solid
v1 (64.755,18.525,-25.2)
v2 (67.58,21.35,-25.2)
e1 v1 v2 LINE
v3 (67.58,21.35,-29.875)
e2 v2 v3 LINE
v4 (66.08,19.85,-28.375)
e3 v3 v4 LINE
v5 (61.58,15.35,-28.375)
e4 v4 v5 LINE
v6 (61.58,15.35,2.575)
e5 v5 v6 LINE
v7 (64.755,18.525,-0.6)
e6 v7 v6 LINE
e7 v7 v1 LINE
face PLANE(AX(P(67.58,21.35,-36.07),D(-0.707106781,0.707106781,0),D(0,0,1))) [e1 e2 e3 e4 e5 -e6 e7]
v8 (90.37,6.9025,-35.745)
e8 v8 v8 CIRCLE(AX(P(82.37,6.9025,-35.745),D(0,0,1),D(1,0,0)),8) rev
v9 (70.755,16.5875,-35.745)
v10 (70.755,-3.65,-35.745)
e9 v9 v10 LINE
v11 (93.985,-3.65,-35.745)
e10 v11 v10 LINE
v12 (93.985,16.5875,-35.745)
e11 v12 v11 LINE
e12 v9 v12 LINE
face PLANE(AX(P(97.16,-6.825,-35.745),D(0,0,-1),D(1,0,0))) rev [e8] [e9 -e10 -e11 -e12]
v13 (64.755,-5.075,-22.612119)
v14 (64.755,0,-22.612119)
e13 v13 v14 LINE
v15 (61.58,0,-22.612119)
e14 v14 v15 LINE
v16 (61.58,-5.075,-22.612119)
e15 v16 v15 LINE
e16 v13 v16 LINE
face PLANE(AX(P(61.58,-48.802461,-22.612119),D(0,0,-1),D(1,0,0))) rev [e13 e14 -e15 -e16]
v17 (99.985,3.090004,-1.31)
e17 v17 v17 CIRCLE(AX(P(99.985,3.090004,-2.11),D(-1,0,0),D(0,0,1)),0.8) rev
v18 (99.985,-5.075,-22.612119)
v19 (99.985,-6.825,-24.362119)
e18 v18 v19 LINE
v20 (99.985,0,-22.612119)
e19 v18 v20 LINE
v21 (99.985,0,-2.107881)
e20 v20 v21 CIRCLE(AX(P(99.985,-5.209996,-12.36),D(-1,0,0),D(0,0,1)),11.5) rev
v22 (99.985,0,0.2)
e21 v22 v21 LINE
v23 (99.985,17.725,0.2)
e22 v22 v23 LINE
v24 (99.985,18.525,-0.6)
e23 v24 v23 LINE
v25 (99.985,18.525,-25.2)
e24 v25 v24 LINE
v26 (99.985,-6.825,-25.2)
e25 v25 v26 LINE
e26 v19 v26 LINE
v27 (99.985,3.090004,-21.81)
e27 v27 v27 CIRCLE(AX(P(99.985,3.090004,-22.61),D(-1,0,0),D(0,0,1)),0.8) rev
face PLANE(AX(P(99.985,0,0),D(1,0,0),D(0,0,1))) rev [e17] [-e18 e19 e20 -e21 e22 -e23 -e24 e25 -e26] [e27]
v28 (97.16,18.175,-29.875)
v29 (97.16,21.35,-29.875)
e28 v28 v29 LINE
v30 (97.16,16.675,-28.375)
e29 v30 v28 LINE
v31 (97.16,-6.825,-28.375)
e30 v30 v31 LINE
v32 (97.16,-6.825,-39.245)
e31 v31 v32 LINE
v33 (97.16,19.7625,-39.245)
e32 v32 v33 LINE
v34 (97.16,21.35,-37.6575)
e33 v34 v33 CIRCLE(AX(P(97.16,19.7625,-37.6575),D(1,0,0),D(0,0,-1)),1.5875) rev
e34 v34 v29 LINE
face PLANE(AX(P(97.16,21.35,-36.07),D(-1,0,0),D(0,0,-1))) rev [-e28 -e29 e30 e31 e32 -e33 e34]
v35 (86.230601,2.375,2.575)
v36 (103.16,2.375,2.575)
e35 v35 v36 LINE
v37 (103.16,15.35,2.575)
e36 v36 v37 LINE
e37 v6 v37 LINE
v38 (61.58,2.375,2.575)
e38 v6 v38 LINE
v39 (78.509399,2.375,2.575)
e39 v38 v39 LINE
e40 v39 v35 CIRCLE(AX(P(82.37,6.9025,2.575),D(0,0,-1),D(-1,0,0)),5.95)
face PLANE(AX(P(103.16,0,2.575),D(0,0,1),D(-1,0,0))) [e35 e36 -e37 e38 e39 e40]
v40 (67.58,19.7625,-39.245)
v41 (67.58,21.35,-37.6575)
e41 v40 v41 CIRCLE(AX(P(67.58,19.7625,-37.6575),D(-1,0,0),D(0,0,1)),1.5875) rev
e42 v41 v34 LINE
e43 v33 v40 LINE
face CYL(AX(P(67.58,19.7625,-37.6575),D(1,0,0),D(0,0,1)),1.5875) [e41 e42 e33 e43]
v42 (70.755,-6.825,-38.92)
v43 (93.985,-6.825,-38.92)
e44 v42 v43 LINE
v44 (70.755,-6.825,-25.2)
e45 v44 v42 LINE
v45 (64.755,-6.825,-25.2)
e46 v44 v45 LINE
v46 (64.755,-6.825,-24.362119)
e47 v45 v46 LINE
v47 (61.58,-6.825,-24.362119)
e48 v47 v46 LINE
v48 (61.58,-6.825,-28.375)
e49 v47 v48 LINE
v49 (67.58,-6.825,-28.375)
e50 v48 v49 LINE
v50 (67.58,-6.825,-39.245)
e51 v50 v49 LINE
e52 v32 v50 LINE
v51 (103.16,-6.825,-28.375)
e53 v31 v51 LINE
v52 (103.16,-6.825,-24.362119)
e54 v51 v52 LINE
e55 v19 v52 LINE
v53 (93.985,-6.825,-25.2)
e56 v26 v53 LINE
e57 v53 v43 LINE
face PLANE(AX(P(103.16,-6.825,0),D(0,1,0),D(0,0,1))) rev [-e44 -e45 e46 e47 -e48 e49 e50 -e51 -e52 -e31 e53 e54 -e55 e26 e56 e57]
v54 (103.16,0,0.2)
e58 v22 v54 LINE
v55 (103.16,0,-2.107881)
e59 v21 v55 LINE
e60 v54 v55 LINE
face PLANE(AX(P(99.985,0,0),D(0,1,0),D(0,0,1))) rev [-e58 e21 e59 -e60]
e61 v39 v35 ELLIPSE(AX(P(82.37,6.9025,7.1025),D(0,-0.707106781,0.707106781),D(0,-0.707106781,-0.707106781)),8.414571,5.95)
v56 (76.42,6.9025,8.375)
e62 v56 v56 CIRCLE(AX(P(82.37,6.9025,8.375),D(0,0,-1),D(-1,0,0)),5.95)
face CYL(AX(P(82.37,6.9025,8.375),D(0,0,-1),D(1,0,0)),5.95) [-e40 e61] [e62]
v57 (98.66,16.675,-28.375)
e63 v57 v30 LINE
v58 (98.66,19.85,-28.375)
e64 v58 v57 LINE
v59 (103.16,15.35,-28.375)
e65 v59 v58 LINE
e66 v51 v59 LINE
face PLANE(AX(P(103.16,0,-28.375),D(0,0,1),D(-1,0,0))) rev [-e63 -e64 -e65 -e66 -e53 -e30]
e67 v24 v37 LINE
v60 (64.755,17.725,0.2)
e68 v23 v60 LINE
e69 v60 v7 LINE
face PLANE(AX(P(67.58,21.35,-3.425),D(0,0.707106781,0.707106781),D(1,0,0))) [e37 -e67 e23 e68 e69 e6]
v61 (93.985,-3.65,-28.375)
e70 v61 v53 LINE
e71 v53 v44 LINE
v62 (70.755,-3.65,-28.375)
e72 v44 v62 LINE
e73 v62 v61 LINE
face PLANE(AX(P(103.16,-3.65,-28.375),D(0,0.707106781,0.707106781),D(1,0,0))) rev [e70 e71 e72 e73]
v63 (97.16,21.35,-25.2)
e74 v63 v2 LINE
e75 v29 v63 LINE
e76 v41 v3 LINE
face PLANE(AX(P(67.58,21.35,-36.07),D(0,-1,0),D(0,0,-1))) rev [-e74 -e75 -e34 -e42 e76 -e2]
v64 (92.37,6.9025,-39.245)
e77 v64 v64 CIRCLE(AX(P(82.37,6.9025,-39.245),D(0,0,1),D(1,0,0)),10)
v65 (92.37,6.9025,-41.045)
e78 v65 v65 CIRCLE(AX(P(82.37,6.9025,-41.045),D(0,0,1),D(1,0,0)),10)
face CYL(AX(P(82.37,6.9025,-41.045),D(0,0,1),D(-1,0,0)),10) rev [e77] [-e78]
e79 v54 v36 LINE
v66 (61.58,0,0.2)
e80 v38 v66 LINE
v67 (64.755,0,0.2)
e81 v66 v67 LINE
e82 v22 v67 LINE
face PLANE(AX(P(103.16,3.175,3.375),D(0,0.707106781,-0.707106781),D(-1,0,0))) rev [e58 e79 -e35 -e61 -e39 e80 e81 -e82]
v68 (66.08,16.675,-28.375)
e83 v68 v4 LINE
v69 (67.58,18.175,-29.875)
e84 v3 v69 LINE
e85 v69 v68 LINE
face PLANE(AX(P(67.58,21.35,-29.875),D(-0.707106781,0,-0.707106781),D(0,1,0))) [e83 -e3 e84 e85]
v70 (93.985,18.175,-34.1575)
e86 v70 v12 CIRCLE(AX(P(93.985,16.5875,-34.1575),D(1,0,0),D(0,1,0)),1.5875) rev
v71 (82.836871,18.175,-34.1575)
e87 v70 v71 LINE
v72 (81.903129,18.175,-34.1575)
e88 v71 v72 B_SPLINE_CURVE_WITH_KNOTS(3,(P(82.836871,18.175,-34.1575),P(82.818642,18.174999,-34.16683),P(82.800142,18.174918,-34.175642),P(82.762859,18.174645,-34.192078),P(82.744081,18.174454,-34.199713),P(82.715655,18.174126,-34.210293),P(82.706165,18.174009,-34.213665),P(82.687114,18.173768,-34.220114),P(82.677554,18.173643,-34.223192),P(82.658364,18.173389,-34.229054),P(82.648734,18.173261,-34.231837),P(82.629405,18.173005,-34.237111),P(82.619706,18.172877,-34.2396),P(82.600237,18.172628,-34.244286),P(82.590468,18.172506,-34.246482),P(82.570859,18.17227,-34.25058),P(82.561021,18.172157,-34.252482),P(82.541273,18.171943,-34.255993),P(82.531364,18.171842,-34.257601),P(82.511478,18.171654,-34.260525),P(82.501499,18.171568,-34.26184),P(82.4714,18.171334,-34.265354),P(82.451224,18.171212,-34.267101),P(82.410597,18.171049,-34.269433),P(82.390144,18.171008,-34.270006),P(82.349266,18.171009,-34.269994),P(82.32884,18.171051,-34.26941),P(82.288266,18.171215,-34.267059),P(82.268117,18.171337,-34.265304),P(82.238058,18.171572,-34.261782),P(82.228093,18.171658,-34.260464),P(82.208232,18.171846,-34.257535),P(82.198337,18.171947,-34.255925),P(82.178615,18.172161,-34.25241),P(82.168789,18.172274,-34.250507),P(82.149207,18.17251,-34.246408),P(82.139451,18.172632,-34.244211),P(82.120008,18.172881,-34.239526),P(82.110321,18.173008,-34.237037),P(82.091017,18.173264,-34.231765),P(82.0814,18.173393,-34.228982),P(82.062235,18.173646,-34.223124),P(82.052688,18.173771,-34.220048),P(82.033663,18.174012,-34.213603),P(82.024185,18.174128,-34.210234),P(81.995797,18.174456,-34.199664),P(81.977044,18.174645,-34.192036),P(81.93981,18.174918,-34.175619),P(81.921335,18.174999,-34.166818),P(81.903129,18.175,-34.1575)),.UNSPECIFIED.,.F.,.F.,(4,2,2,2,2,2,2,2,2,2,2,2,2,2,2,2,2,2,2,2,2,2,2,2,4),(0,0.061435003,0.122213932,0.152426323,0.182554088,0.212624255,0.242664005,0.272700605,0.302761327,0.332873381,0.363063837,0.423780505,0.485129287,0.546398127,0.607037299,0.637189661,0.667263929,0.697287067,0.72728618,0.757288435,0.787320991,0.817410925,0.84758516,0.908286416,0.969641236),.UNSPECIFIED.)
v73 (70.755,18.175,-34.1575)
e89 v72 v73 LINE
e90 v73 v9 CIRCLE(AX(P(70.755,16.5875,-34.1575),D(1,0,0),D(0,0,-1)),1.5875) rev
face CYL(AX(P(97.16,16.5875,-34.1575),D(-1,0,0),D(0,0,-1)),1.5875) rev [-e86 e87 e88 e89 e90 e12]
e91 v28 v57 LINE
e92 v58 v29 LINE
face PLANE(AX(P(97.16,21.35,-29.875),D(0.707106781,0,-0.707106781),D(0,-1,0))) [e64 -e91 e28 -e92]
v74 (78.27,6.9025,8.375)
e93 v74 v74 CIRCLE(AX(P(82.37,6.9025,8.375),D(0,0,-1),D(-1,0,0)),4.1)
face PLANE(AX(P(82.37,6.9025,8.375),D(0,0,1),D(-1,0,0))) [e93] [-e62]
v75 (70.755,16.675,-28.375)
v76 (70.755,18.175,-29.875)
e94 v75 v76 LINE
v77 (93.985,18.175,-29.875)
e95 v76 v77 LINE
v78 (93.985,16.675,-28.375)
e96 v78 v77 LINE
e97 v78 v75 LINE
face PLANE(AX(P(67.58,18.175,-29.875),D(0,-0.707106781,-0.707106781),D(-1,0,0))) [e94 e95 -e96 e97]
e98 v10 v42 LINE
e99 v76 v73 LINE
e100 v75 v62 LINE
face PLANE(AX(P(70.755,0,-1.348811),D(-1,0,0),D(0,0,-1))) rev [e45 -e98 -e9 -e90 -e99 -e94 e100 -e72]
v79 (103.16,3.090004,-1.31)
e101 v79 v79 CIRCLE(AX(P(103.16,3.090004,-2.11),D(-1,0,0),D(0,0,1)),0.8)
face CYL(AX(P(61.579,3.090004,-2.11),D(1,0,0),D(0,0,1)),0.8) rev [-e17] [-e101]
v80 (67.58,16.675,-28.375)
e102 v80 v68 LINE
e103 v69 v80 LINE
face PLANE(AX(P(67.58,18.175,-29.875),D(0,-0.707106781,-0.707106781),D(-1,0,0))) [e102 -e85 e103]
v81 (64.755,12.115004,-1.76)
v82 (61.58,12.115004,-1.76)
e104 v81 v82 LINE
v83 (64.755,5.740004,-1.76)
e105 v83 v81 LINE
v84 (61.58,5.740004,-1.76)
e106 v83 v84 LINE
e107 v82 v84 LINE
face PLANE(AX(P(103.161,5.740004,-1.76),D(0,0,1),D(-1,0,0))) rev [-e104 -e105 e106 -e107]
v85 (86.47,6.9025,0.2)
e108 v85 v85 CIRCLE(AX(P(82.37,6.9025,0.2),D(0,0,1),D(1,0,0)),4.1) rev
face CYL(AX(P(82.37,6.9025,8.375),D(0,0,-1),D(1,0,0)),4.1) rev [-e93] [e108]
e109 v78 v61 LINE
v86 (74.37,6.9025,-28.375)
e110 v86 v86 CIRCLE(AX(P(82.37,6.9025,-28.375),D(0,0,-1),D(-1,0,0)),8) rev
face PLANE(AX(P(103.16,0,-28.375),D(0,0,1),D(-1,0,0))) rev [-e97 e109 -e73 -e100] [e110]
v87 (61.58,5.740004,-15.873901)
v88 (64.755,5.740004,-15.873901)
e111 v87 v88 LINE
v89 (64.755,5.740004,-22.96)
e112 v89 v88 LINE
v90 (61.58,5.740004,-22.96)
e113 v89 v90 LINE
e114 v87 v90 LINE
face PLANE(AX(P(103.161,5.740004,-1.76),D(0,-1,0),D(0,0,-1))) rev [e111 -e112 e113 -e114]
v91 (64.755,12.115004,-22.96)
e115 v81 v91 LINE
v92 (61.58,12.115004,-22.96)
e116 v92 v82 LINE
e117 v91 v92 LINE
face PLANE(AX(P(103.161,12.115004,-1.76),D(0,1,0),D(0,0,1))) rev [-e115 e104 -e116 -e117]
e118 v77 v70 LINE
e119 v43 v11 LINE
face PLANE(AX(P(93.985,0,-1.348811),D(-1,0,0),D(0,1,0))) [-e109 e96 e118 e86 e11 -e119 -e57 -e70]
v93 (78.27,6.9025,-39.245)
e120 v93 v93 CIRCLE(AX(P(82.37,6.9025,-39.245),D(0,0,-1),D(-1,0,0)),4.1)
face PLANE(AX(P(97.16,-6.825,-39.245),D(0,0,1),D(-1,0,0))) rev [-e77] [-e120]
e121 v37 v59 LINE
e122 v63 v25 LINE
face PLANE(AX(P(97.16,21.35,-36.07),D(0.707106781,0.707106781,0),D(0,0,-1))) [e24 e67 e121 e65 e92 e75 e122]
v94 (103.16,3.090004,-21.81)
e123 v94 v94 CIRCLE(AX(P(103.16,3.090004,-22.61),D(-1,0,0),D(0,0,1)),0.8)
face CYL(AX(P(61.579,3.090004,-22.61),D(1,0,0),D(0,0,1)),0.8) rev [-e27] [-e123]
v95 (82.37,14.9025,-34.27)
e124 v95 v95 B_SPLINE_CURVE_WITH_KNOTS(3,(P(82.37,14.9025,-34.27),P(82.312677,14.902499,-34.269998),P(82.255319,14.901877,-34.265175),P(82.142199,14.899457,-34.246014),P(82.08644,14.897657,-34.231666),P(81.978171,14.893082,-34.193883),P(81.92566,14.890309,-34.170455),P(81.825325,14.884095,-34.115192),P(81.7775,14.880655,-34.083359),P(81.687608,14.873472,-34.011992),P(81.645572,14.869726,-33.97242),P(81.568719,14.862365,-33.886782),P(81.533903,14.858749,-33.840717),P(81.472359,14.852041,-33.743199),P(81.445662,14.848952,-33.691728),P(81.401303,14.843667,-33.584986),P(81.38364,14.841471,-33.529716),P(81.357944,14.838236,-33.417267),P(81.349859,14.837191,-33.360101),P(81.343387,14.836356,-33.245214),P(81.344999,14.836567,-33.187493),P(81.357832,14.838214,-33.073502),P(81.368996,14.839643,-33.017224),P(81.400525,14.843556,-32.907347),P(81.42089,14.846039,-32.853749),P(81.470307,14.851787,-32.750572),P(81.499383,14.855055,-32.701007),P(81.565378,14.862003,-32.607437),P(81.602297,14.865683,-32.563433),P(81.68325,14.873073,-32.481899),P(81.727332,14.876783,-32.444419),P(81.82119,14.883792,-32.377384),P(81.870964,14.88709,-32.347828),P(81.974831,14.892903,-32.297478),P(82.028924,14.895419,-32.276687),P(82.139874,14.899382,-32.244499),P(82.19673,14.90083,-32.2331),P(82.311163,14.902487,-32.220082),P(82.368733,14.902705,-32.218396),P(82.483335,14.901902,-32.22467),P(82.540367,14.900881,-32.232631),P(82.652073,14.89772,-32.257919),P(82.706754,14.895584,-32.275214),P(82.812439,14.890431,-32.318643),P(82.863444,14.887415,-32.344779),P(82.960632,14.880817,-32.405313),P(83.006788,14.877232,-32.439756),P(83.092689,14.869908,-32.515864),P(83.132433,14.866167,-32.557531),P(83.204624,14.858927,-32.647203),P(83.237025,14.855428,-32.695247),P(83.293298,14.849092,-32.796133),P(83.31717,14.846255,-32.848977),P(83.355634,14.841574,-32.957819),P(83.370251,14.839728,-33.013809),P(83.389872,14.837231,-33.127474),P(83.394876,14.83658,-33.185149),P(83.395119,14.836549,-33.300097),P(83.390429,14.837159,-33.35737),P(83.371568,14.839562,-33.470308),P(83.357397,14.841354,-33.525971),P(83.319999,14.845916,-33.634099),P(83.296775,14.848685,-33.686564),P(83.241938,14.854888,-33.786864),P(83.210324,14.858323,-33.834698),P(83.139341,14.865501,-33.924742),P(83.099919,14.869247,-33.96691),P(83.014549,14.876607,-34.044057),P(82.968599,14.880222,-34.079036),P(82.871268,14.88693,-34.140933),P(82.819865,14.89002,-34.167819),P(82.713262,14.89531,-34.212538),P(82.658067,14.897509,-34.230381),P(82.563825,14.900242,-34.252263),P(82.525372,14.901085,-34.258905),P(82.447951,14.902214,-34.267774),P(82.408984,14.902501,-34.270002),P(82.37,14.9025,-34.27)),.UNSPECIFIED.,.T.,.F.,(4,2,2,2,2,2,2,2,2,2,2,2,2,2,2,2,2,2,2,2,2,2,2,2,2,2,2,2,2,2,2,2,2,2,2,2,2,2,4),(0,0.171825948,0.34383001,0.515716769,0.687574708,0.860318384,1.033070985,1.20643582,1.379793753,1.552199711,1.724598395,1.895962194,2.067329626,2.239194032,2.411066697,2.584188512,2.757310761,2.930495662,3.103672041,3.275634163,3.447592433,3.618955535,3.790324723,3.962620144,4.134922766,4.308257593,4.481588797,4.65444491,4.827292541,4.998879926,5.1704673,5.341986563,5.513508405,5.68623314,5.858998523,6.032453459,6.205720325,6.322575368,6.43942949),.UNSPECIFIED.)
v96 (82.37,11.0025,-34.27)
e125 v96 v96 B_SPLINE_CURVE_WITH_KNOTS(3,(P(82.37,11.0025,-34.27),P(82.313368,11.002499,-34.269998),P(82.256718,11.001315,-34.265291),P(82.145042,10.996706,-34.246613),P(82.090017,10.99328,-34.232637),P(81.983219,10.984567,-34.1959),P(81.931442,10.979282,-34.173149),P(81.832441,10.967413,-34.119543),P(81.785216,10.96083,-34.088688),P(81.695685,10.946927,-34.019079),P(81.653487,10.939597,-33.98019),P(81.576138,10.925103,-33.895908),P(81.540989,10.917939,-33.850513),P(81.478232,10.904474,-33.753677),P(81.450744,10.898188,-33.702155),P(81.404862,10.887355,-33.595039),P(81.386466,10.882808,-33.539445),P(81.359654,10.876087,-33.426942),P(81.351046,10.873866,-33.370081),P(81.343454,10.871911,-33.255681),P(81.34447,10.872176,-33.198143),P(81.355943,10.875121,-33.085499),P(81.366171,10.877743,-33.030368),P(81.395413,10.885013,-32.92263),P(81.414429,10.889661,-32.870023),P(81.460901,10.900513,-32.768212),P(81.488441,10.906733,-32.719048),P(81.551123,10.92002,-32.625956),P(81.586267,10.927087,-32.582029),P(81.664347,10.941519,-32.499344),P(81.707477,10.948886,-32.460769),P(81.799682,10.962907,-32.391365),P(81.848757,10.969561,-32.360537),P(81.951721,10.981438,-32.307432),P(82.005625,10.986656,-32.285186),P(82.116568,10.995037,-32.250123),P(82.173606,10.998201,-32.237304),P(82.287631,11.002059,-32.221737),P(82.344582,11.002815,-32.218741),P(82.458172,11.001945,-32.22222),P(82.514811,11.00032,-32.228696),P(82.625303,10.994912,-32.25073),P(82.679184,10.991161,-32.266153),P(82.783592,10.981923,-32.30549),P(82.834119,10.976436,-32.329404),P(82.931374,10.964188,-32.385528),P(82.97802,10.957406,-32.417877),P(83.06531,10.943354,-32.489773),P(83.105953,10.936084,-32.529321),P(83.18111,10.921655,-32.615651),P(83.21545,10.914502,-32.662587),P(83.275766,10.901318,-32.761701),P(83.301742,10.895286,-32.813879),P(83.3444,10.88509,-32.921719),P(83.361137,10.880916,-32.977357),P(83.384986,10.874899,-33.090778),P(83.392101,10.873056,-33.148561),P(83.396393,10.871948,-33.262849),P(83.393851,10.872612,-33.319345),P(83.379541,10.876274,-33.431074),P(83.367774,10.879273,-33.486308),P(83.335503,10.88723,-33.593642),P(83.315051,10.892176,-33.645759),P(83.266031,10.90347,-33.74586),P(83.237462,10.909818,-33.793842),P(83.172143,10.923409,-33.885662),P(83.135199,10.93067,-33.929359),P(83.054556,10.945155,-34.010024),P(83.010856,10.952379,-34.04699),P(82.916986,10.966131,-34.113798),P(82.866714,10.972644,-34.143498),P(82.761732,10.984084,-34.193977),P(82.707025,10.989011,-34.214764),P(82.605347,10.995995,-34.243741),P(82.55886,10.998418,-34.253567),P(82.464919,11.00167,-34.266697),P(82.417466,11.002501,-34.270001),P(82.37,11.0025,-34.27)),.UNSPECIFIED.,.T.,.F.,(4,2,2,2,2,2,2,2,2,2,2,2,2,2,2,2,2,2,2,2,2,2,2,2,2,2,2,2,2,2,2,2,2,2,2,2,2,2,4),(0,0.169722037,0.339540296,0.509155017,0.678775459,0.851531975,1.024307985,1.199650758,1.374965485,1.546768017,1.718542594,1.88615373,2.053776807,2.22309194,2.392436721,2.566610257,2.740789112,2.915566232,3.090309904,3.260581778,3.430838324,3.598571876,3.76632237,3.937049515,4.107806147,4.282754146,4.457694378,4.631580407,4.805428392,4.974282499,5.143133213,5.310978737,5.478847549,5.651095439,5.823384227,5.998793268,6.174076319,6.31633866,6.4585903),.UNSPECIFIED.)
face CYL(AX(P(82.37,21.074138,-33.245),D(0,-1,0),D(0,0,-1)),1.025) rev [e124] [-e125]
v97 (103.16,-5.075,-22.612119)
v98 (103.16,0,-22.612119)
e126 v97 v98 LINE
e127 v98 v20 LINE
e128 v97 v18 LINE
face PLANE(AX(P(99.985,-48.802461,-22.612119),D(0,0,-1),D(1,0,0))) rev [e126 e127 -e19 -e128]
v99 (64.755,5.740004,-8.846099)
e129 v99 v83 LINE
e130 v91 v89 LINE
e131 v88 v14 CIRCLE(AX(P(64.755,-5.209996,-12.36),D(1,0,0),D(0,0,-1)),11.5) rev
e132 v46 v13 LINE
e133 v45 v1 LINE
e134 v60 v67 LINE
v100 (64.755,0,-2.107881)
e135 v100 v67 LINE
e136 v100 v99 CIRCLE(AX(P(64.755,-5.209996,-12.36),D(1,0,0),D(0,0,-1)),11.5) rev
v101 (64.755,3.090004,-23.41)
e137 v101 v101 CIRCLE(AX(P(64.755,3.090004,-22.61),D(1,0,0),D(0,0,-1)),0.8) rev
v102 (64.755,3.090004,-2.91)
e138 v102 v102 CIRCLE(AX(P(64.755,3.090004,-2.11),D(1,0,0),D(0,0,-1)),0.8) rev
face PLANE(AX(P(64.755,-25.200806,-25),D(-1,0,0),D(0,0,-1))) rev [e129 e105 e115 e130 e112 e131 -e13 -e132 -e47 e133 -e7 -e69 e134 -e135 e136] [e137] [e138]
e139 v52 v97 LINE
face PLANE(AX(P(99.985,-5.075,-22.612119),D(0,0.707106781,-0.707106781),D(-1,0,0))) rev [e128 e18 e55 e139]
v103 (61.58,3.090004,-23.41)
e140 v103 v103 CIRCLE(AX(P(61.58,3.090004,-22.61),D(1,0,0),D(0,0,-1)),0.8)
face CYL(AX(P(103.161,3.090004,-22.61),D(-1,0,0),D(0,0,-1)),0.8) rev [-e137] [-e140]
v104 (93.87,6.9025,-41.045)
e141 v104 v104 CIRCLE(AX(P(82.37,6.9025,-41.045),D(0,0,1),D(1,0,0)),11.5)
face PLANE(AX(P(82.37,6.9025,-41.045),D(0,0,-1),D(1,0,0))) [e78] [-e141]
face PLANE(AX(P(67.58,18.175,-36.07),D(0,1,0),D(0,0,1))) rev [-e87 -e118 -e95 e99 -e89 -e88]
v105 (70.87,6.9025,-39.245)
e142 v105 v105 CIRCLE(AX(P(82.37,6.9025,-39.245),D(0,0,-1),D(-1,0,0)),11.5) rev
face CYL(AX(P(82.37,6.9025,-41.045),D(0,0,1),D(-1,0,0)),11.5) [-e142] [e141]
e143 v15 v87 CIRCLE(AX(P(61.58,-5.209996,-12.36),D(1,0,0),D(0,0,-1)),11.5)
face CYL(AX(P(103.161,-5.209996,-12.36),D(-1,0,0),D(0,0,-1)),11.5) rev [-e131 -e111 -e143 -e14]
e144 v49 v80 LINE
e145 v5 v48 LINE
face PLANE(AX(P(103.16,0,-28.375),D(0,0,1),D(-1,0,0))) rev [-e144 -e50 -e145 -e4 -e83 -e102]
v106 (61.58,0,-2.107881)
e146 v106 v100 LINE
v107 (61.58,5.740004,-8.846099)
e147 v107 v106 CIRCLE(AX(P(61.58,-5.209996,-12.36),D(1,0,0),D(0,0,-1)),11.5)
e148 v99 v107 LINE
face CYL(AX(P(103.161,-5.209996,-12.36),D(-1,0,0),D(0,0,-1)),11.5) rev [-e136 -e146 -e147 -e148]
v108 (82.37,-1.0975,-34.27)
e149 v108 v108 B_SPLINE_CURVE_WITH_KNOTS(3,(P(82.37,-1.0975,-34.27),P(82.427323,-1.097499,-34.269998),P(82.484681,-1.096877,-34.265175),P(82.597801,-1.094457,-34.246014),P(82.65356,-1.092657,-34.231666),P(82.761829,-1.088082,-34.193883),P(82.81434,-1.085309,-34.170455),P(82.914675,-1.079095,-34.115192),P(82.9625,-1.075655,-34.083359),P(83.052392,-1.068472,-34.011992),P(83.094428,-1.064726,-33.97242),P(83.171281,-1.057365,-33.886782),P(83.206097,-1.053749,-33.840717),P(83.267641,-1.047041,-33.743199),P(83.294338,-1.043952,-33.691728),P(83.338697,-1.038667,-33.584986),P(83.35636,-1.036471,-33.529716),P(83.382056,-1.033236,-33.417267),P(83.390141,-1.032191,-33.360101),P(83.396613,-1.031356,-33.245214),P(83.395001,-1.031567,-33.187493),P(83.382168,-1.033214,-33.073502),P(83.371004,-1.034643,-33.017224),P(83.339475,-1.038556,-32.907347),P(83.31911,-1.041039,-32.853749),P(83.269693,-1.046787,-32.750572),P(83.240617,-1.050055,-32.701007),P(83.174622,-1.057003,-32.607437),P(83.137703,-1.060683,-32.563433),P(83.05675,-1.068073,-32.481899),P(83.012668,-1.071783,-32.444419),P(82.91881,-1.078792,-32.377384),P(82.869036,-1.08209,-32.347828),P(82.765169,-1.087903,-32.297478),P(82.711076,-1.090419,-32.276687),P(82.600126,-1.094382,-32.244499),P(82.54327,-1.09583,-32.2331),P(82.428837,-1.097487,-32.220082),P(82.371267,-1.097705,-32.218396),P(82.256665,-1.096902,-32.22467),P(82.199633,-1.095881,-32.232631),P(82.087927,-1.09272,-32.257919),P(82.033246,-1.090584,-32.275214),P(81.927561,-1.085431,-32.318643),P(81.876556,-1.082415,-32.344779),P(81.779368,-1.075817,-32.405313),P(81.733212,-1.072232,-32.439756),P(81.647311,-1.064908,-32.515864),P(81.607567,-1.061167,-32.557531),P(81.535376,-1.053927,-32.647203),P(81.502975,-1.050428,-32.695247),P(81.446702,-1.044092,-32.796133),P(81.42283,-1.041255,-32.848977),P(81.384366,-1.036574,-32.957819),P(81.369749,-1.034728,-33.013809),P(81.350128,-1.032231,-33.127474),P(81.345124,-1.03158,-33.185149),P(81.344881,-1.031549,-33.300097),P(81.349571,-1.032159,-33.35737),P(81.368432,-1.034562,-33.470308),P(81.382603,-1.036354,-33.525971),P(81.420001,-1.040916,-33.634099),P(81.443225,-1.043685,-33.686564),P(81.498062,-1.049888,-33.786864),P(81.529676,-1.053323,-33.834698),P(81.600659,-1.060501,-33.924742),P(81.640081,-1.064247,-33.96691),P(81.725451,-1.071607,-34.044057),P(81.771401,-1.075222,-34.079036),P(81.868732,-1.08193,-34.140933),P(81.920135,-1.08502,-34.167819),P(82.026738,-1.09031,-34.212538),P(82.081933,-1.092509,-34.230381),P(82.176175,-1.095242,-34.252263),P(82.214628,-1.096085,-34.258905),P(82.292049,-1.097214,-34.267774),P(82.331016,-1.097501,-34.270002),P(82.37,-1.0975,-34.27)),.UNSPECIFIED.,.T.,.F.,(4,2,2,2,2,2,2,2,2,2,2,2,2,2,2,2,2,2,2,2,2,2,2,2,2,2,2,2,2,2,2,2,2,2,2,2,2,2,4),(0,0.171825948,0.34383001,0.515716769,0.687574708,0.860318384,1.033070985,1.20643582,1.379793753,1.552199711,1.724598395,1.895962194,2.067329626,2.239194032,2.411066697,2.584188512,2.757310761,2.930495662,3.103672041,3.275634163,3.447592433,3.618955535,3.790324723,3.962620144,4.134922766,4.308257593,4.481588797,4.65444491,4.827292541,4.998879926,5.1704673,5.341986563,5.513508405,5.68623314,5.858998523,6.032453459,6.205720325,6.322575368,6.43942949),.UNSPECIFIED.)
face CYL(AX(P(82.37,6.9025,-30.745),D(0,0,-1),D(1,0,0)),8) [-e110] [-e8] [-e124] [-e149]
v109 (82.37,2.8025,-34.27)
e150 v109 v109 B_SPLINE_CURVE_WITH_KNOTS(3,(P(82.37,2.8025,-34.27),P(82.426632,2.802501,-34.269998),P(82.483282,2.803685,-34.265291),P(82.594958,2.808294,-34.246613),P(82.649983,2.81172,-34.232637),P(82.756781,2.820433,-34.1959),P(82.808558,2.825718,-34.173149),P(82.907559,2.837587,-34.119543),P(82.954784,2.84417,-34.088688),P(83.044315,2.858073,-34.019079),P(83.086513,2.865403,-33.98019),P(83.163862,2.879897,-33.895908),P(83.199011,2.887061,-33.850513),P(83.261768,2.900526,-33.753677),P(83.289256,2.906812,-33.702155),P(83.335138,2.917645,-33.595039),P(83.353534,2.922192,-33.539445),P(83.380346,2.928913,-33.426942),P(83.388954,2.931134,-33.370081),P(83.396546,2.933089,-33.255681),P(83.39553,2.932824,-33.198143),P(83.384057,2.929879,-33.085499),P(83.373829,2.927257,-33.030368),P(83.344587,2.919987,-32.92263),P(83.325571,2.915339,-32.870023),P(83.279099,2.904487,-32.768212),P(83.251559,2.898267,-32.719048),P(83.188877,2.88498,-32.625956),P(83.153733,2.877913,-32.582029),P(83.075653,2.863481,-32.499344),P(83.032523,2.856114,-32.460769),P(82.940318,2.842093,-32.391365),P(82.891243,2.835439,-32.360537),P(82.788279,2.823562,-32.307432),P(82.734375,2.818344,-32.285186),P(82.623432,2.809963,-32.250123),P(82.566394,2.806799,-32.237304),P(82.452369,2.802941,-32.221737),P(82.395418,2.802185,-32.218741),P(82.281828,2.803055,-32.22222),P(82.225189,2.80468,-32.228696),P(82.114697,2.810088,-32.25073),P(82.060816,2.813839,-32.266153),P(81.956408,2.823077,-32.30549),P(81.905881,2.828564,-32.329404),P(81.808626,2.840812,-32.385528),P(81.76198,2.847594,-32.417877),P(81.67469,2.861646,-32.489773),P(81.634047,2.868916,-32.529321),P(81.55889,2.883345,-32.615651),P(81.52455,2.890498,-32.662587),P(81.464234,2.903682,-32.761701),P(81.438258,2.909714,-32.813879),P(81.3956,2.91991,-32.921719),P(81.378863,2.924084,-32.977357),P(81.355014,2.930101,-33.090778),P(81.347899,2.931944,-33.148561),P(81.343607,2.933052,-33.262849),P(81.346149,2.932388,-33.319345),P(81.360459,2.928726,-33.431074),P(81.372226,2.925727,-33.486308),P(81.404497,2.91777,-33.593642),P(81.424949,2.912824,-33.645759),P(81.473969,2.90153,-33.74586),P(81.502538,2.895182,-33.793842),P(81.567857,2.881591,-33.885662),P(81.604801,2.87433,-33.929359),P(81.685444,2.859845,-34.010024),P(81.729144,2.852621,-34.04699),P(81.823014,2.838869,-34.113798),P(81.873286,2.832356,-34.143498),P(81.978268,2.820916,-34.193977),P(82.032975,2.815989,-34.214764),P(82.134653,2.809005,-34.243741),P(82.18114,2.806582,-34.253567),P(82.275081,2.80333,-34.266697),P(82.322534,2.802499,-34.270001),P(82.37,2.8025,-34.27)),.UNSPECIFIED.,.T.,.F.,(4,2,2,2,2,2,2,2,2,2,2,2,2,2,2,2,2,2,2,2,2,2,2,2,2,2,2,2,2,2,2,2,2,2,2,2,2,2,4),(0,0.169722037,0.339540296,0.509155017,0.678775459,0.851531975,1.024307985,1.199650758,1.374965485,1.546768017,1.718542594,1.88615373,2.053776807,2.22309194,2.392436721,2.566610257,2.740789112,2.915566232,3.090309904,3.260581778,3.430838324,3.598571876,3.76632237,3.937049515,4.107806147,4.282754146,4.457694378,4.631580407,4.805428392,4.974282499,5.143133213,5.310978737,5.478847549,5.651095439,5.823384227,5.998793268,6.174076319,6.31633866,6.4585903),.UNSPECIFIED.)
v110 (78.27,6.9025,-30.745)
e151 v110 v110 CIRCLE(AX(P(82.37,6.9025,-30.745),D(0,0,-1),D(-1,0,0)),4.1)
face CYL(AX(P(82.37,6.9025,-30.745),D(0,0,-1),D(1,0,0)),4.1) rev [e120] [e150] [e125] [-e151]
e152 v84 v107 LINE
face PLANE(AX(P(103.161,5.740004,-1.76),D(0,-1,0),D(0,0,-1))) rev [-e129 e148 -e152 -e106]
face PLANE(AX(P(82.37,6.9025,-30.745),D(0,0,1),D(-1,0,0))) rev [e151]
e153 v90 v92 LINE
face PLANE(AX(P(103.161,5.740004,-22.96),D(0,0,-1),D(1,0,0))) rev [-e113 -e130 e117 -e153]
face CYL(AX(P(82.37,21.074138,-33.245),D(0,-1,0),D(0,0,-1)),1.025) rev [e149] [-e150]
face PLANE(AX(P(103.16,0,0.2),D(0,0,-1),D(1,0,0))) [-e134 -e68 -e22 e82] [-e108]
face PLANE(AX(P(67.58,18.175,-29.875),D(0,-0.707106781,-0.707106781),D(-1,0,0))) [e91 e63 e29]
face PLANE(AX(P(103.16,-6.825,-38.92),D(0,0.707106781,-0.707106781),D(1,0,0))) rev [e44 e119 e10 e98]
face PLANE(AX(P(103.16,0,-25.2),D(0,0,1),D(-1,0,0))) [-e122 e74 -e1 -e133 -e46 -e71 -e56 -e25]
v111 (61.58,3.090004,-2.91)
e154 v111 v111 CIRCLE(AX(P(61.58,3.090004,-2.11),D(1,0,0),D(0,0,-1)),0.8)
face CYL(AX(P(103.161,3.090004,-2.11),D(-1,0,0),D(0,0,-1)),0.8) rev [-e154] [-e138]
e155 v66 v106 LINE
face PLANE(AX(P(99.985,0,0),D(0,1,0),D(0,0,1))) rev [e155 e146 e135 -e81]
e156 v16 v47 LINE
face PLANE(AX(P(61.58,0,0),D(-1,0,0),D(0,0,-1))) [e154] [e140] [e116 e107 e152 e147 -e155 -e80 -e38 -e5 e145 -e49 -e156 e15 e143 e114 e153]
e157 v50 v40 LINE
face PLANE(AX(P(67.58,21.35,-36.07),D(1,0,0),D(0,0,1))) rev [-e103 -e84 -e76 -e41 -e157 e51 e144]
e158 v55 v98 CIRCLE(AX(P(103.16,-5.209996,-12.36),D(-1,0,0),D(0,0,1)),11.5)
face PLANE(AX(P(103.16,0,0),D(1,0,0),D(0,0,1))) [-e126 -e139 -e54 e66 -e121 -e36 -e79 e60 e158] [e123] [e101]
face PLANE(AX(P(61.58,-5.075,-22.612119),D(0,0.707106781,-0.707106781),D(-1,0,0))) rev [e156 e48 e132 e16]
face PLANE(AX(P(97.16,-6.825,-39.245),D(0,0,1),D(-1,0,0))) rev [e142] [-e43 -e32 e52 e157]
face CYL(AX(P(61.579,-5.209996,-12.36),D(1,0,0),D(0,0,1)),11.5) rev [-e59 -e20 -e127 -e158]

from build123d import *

# Parameters (mm, degrees)
SKETCH1_W                       = 25
SKETCH1_H                       = 30
BOSS_EXTRUDE1_DEPTH             = 3.175
SKETCH2_W                       = 25
SKETCH2_H                       = 3.175
BOSS_EXTRUDE2_DEPTH             = 41.58
SKETCH3_W                       = 3.175
SKETCH3_H                       = 25
BOSS_EXTRUDE3_DEPTH             = 30
CUT_EXTRUDE1_REACH              = 60.775
SKETCH4_R                       = 11.5
CUT_EXTRUDE2_REACH              = 60.775
SKETCH5_R                       = 0.8
CUT_EXTRUDE3_REACH              = 60.775
SKETCH6_R                       = 0.8
SKETCH6_R_2                     = 0.799851166
SKETCH6_W                       = 21.2
SKETCH6_H                       = 6.375
CUT_EXTRUDE4_REACH              = 60.775
SKETCH7_R                       = 11.5
BOSS_EXTRUDE4_DEPTH             = 0.2
SKETCH9_W                       = 41.58
SKETCH9_H                       = 33.175
BOSS_EXTRUDE5_DEPTH             = 3.175
BOSS_EXTRUDE6_DEPTH             = 0.2
SKETCH11_W                      = 41.58
SKETCH11_H                      = 33.175
BOSS_EXTRUDE7_DEPTH             = 3.175
CHAMFER1_SIZE                   = 3.175
CHAMFER2_SIZE                   = 3.175
SKETCH13_W                      = 29.58
SKETCH13_H                      = 3.175
BOSS_EXTRUDE8_DEPTH             = 7.695
BOSS_EXTRUDE9_REACH             = 59.968
SKETCH14_W                      = 29.58
SKETCH14_H                      = 3.5
BOSS_EXTRUDE9_DIRECTION_2_DEPTH = 25
FILLET1_R                       = 1.5875
FILLET2_R                       = 1.5875
CUT_EXTRUDE5_REACH              = 70.161
SKETCH16_R                      = 7.1
SKETCH20_R                      = 8
SKETCH20_R_2                    = 4.1
BOSS_EXTRUDE11_DEPTH            = 5
CUT_EXTRUDE6_START              = -21.7275
SKETCH21_R                      = 1.025
CUT_EXTRUDE6_DEPTH              = 16
BOSS_EXTRUDE12_DEPTH            = 5
BOSS_EXTRUDE12_DEPTH_BACK       = 1.2
SKETCH23_R                      = 5.95
SKETCH23_R_2                    = 4.1
CUT_EXTRUDE9_START              = -0.8
SKETCH35_W                      = 56.674577384
SKETCH35_H                      = 32.233153273
SKETCH35_R                      = 5.95
CUT_EXTRUDE9_DEPTH              = 0.8
CHAMFER4_SIZE                   = 1.5
SKETCH24_R                      = 11.5
SKETCH24_R_2                    = 10
BOSS_EXTRUDE13_DEPTH            = 1.8
SKETCH25_W                      = 108.105246784
SKETCH25_H                      = 63.591321638
CUT_EXTRUDE7_DEPTH              = 11.825
CHAMFER5_SIZE                   = 6
CUT_EXTRUDE8_START              = -3.175
SKETCH26_R                      = 4.1
CUT_EXTRUDE8_DEPTH              = 3.175
BOSS_EXTRUDE14_START            = 1.975
BOSS_EXTRUDE14_DEPTH            = 1.975
BOSS_EXTRUDE16_START            = 3.5
SKETCH29_R                      = 7.1
SKETCH29_R_2                    = 4.1
BOSS_EXTRUDE16_DEPTH            = 3.5
BOSS_EXTRUDE17_REACH            = 66.275
SKETCH31_W                      = 3.175
SKETCH31_H                      = 26.839044126
BOSS_EXTRUDE18_DEPTH            = 6.825
SKETCH34_R                      = 8
BOSS_EXTRUDE19_DEPTH            = 2.37
CHAMFER7_SIZE                   = 3.175
CHAMFER8_SIZE                   = 1.75


# Some blends are built 0.0001 mm under size
with BuildPart() as part:
    # Sketch1 → Boss-Extrude1 (new body)
    with BuildSketch(Plane(origin=(0, 0, 0), x_dir=(0, 0, -1), z_dir=(1, 0, 0))):
        with Locations((12.5, 15)):
            Rectangle(SKETCH1_W, SKETCH1_H)
    extrude(amount=BOSS_EXTRUDE1_DEPTH)

    # Sketch2 → Boss-Extrude2 (add)
    with BuildSketch(Plane.ZY):
        with Locations((-12.5, 31.5875)):
            Rectangle(SKETCH2_W, SKETCH2_H)
    extrude(amount=-BOSS_EXTRUDE2_DEPTH)

    # Sketch3 → Boss-Extrude3 (add)
    with BuildSketch(Plane.XZ.offset(-30)):
        with Locations((39.9925, -12.5)):
            Rectangle(SKETCH3_W, SKETCH3_H)
    extrude(amount=BOSS_EXTRUDE3_DEPTH)

    # Sketch4 → Cut-Extrude1 (cut, up to next)
    with BuildSketch(Plane.ZY, mode=Mode.PRIVATE) as cut_extrude1_sk1:
        with Locations((-12.359999929, -5.209996254)):
            Circle(SKETCH4_R)
    cut_extrude1_tool1 = extrude(cut_extrude1_sk1.sketch, amount=-CUT_EXTRUDE1_REACH, mode=Mode.PRIVATE) & part.part
    add(cut_extrude1_tool1.solids().sort_by_distance((0, -5.209996, -12.36))[0], mode=Mode.SUBTRACT)

    # Sketch5 → Cut-Extrude2 (cut, up to next)
    with BuildSketch(Plane.ZY, mode=Mode.PRIVATE) as cut_extrude2_sk1:
        with Locations((-22.609999929, 3.090003746)):
            Circle(SKETCH5_R)
    cut_extrude2_tool1 = extrude(cut_extrude2_sk1.sketch, amount=-CUT_EXTRUDE2_REACH, mode=Mode.PRIVATE) & part.part
    # Sketch5 → Cut-Extrude2 (cut, up to next)
    with BuildSketch(Plane.ZY, mode=Mode.PRIVATE) as cut_extrude2_sk2:
        with Locations((-22.609999929, 23.790003746)):
            Circle(SKETCH5_R)
    cut_extrude2_tool2 = extrude(cut_extrude2_sk2.sketch, amount=-CUT_EXTRUDE2_REACH, mode=Mode.PRIVATE) & part.part
    # Sketch5 → Cut-Extrude2 (cut, up to next)
    with BuildSketch(Plane.ZY, mode=Mode.PRIVATE) as cut_extrude2_sk3:
        with Locations((-2.109999929, 23.790003746)):
            Circle(SKETCH5_R)
    cut_extrude2_tool3 = extrude(cut_extrude2_sk3.sketch, amount=-CUT_EXTRUDE2_REACH, mode=Mode.PRIVATE) & part.part
    # Sketch5 → Cut-Extrude2 (cut, up to next)
    with BuildSketch(Plane.ZY, mode=Mode.PRIVATE) as cut_extrude2_sk4:
        with Locations((-2.109999929, 3.090003746)):
            Circle(SKETCH5_R)
    cut_extrude2_tool4 = extrude(cut_extrude2_sk4.sketch, amount=-CUT_EXTRUDE2_REACH, mode=Mode.PRIVATE) & part.part
    add(cut_extrude2_tool1.solids().sort_by_distance((0, 3.090004, -22.61))[0], mode=Mode.SUBTRACT)
    add(cut_extrude2_tool2.solids().sort_by_distance((0, 23.790004, -22.61))[0], mode=Mode.SUBTRACT)
    add(cut_extrude2_tool3.solids().sort_by_distance((0, 23.790004, -2.11))[0], mode=Mode.SUBTRACT)
    add(cut_extrude2_tool4.solids().sort_by_distance((0, 3.090004, -2.11))[0], mode=Mode.SUBTRACT)

    # Sketch6 → Cut-Extrude3 (cut, up to next)
    with BuildSketch(Plane(origin=(41.58, 0, 0), x_dir=(0, 0, -1), z_dir=(1, 0, 0)), mode=Mode.PRIVATE) as cut_extrude3_sk1:
        with Locations(Location((2.109999929, 3.090003746, 0), (0, 0, 180))):
            Circle(SKETCH6_R)
    cut_extrude3_tool1 = extrude(cut_extrude3_sk1.sketch, amount=-CUT_EXTRUDE3_REACH, mode=Mode.PRIVATE) & part.part
    # Sketch6 → Cut-Extrude3 (cut, up to next)
    with BuildSketch(Plane(origin=(41.58, 0, 0), x_dir=(0, 0, -1), z_dir=(1, 0, 0)), mode=Mode.PRIVATE) as cut_extrude3_sk2:
        with Locations(Location((22.609999929, 3.090003746, 0), (0, 0, 180))):
            Circle(SKETCH6_R)
    cut_extrude3_tool2 = extrude(cut_extrude3_sk2.sketch, amount=-CUT_EXTRUDE3_REACH, mode=Mode.PRIVATE) & part.part
    # Sketch6 → Cut-Extrude3 (cut, up to next)
    with BuildSketch(Plane(origin=(41.58, 0, 0), x_dir=(0, 0, -1), z_dir=(1, 0, 0)), mode=Mode.PRIVATE) as cut_extrude3_sk3:
        with Locations((22.609999929, 27.540003746)):
            Circle(SKETCH6_R_2)
    cut_extrude3_tool3 = extrude(cut_extrude3_sk3.sketch, amount=-CUT_EXTRUDE3_REACH, mode=Mode.PRIVATE) & part.part
    # Sketch6 → Cut-Extrude3 (cut, up to next)
    with BuildSketch(Plane(origin=(41.58, 0, 0), x_dir=(0, 0, -1), z_dir=(1, 0, 0)), mode=Mode.PRIVATE) as cut_extrude3_sk4:
        with Locations((2.109999929, 27.540003746)):
            Circle(SKETCH6_R)
    cut_extrude3_tool4 = extrude(cut_extrude3_sk4.sketch, amount=-CUT_EXTRUDE3_REACH, mode=Mode.PRIVATE) & part.part
    # Sketch6 → Cut-Extrude3 (cut, up to next)
    with BuildSketch(Plane(origin=(41.58, 0, 0), x_dir=(0, 0, -1), z_dir=(1, 0, 0)), mode=Mode.PRIVATE) as cut_extrude3_sk5:
        with Locations((12.359999929, 8.927503746)):
            Rectangle(SKETCH6_W, SKETCH6_H)
    cut_extrude3_tool5 = extrude(cut_extrude3_sk5.sketch, amount=-CUT_EXTRUDE3_REACH, mode=Mode.PRIVATE) & part.part
    add(cut_extrude3_tool1.solids().sort_by_distance((41.58, 3.090004, -2.11))[0], mode=Mode.SUBTRACT)
    add(cut_extrude3_tool2.solids().sort_by_distance((41.58, 3.090004, -22.61))[0], mode=Mode.SUBTRACT)
    add(cut_extrude3_tool3.solids().sort_by_distance((41.58, 27.540004, -22.61))[0], mode=Mode.SUBTRACT)
    add(cut_extrude3_tool4.solids().sort_by_distance((41.58, 27.540004, -2.11))[0], mode=Mode.SUBTRACT)
    add(cut_extrude3_tool5.solids().sort_by_distance((41.58, 8.927504, -12.36))[0], mode=Mode.SUBTRACT)

    # Sketch7 → Cut-Extrude4 (cut, up to next)
    with BuildSketch(Plane(origin=(41.58, 0, 0), x_dir=(0, 0, -1), z_dir=(1, 0, 0)), mode=Mode.PRIVATE) as cut_extrude4_sk1:
        with Locations((12.359999929, -5.209996254)):
            Circle(SKETCH7_R)
    cut_extrude4_tool1 = extrude(cut_extrude4_sk1.sketch, amount=-CUT_EXTRUDE4_REACH, mode=Mode.PRIVATE) & part.part
    add(cut_extrude4_tool1.solids().sort_by_distance((41.58, -5.209996, -12.36))[0], mode=Mode.SUBTRACT)

    # Sketch8 → Boss-Extrude4 (add)
    with BuildSketch(Plane.XY):
        Polygon((0, 33.175), (0, 0), (3.175, 0), (3.175, 30), (38.405, 30), (38.405, 0), (41.58, 0), (41.58, 33.175), align=None)
    extrude(amount=BOSS_EXTRUDE4_DEPTH)

    # Sketch9 → Boss-Extrude5 (add)
    with BuildSketch(Plane.XY.offset(0.2)):
        with Locations((20.79, 16.5875)):
            Rectangle(SKETCH9_W, SKETCH9_H)
    extrude(amount=BOSS_EXTRUDE5_DEPTH)

    # Sketch10 → Boss-Extrude6 (add)
    with BuildSketch(Plane(origin=(0, 0, -25), x_dir=(-1, 0, 0), z_dir=(0, 0, -1))):
        Polygon((0, 0), (0, 33.175), (-41.58, 33.175), (-41.58, 0), (-38.405, 0), (-38.405, 30), (-3.175, 30), (-3.175, 0), align=None)
    extrude(amount=BOSS_EXTRUDE6_DEPTH)

    # Sketch11 → Boss-Extrude7 (add)
    with BuildSketch(Plane(origin=(0, 0, -25.2), x_dir=(-1, 0, 0), z_dir=(0, 0, -1))):
        with Locations((-20.79, 16.5875)):
            Rectangle(SKETCH11_W, SKETCH11_H)
    extrude(amount=BOSS_EXTRUDE7_DEPTH)

    # Chamfer1
    chamfer1_edges = [part.edges().sort_by_distance(p)[0] for p in [
        (20.79, 33.175, 3.375),
        (20.79, 33.175, -28.375),
    ]]
    chamfer(chamfer1_edges, length=CHAMFER1_SIZE)

    # Chamfer2
    chamfer2_edges = [part.edges().sort_by_distance(p)[0] for p in [
        (20.79, 0, 3.375),
    ]]
    chamfer(chamfer2_edges, length=CHAMFER2_SIZE - 0.0001)  # a hair under: the kernel refuses the full size

    # Sketch13 → Boss-Extrude8 (add)
    with BuildSketch(Plane(origin=(0, 0, -28.375), x_dir=(-1, 0, 0), z_dir=(0, 0, -1))):
        with Locations((-20.79, 19.7625)):
            Rectangle(SKETCH13_W, SKETCH13_H)
    extrude(amount=BOSS_EXTRUDE8_DEPTH)

    # Boss-Extrude9: up to this face of the body (flat: up to its plane)
    boss_extrude9_end = Plane(part.part.faces().sort_by_distance((20.79, 21.35, -32.2225))[0])
    # Sketch14 → Boss-Extrude9 (add, up to the picked face)
    with BuildSketch(Plane.XZ.offset(-18.175), mode=Mode.PRIVATE) as boss_extrude9_sk1:
        with Locations((20.79, -37.495)):
            Rectangle(SKETCH14_W, SKETCH14_H)
    boss_extrude9_tool1 = split(extrude(boss_extrude9_sk1.sketch, amount=-BOSS_EXTRUDE9_REACH, mode=Mode.PRIVATE), bisect_by=boss_extrude9_end, keep=Keep.BOTH, mode=Mode.PRIVATE)
    add(boss_extrude9_tool1.solids().sort_by(Axis((20.79, 18.175, -37.495), (0, 1, 0)))[0])

    # Sketch14 → Boss-Extrude9 direction 2 (add)
    with BuildSketch(Plane.XZ.offset(-18.175)):
        with Locations((20.79, -37.495)):
            Rectangle(SKETCH14_W, SKETCH14_H)
    extrude(amount=BOSS_EXTRUDE9_DIRECTION_2_DEPTH)

    # Fillet1
    fillet1_edges = [part.edges().sort_by_distance(p)[0] for p in [
        (20.79, 18.175, -35.745),
        (20.79, 21.35, -39.245),
    ]]
    fillet(fillet1_edges, radius=FILLET1_R)

    # Fillet2
    fillet2_edges = [part.edges().sort_by_distance(p)[0] for p in [
        (20.79, 21.35, -28.375),
    ]]
    fillet(fillet2_edges, radius=FILLET2_R)

    # Sketch16 → Cut-Extrude5 (cut, up to next)
    with BuildSketch(Plane(origin=(0, 0, -39.245), x_dir=(-1, 0, 0), z_dir=(0, 0, -1)), mode=Mode.PRIVATE) as cut_extrude5_sk1:
        with Locations((-20.79, 6.9025)):
            Circle(SKETCH16_R)
    cut_extrude5_tool1 = extrude(cut_extrude5_sk1.sketch, amount=-CUT_EXTRUDE5_REACH, mode=Mode.PRIVATE) & part.part
    add(cut_extrude5_tool1.solids().sort_by_distance((20.79, 6.9025, -39.245))[0], mode=Mode.SUBTRACT)

    # Sketch20 → Boss-Extrude11 (add)
    with BuildSketch(Plane.XY.offset(-35.745)):
        with Locations(Location((20.79, 6.9025, 0), (0, 0, 180))):
            Circle(SKETCH20_R)
        with Locations((20.79, 6.9025)):
            Circle(SKETCH20_R_2, mode=Mode.SUBTRACT)
    extrude(amount=BOSS_EXTRUDE11_DEPTH)

    # Sketch21 → Cut-Extrude6 (cut)
    with BuildSketch(Plane.XZ.offset(6.825).offset(CUT_EXTRUDE6_START)):
        with Locations(Location((20.79, -33.245, 0), (0, 0, 270))):
            Circle(SKETCH21_R)
    extrude(amount=CUT_EXTRUDE6_DEPTH, mode=Mode.SUBTRACT)

    # Sketch23 → Boss-Extrude12 (add, two sides: drawn at the far end of the back side and taken through both)
    with BuildSketch(Plane.XY.offset(3.375).offset(-BOSS_EXTRUDE12_DEPTH_BACK)):
        with Locations(Location((20.79, 6.9025, 0), (0, 0, 218.790206305))):
            Circle(SKETCH23_R)
        with Locations((20.79, 6.9025)):
            Circle(SKETCH23_R_2, mode=Mode.SUBTRACT)
    extrude(amount=BOSS_EXTRUDE12_DEPTH + BOSS_EXTRUDE12_DEPTH_BACK)

    # Sketch35 → Cut-Extrude9 (cut)
    with BuildSketch(Plane.XY.offset(3.375).offset(CUT_EXTRUDE9_START)):
        with Locations((23.209536951, 5.991217874)):
            Rectangle(SKETCH35_W, SKETCH35_H)
        with Locations(Location((20.79, 6.9025, 0), (0, 0, 229.545756186))):
            Circle(SKETCH35_R, mode=Mode.SUBTRACT)
    extrude(amount=CUT_EXTRUDE9_DEPTH, mode=Mode.SUBTRACT)

    # Chamfer4
    chamfer4_edges = [part.edges().sort_by_distance(p)[0] for p in [
        (35.58, 20.55625, -28.375),
        (20.79, 18.175, -28.375),
        (6, 20.55625, -28.375),
    ]]
    chamfer(chamfer4_edges, length=CHAMFER4_SIZE)

    # Sketch24 → Boss-Extrude13 (add)
    with BuildSketch(Plane(origin=(0, 0, -39.245), x_dir=(-1, 0, 0), z_dir=(0, 0, -1))):
        with Locations(Location((-20.79, 6.9025, 0), (0, 0, 180))):
            Circle(SKETCH24_R)
        with Locations((-20.79, 6.9025)):
            Circle(SKETCH24_R_2, mode=Mode.SUBTRACT)
    extrude(amount=BOSS_EXTRUDE13_DEPTH)

    # Sketch25 → Cut-Extrude7 (cut)
    with BuildSketch(Plane(origin=(0, 33.175, 0), x_dir=(1, 0, 0), z_dir=(0, 1, 0))):
        with Locations((27.427563227, 10.078434484)):
            Rectangle(SKETCH25_W, SKETCH25_H)
    extrude(amount=-CUT_EXTRUDE7_DEPTH, mode=Mode.SUBTRACT)

    # Chamfer5
    # the kernel refuses this chamfer: 6 mm, written as the material it takes off along each edge
    with BuildSketch(Plane(origin=(41.58, 21.35, -43.805097928), x_dir=(0.027495876610586775, -0.9996219169112968, 0), z_dir=(0, 0, 1)), Plane(origin=(0, 21.35, 18.005097928), x_dir=(-0.02749587661058637, -0.9996219169112968, 0), z_dir=(0, 0, -1))) as chamfer5_piece_1:
        Polygon((CHAMFER5_SIZE * 0.999621916911, -CHAMFER5_SIZE * 0.0274958766106), (-CHAMFER5_SIZE * 0.0274958766106, -CHAMFER5_SIZE * 0.999621916911), (0, 0), align=None)
    extrude(amount=61.810195856, mode=Mode.SUBTRACT)
    with BuildSketch(Plane(origin=(57.010097928, 21.35, 2.575), x_dir=(0, -0.9996219169112969, 0.027495876610586348), z_dir=(-1, 0, 0))) as chamfer5_piece_2:
        Polygon((CHAMFER5_SIZE * 0.999621916911, -CHAMFER5_SIZE * 0.0274958766106), (-CHAMFER5_SIZE * 0.0274958766106, -CHAMFER5_SIZE * 0.999621916911), (0, 0), align=None)
    extrude(amount=72.440195856, mode=Mode.SUBTRACT)

    # Sketch26 → Cut-Extrude8 (cut)
    with BuildSketch(Plane.XY.offset(3.375).offset(CUT_EXTRUDE8_START)):
        with Locations((20.79, 6.9025)):
            Circle(SKETCH26_R)
    extrude(amount=CUT_EXTRUDE8_DEPTH, mode=Mode.SUBTRACT)

    # Sketch27 → Boss-Extrude14 (add)
    with BuildSketch(Plane(origin=(0, 0, 2.175), x_dir=(-1, 0, 0), z_dir=(0, 0, -1)).offset(BOSS_EXTRUDE14_START)):
        with BuildLine():
            Line((-17.454997189, 1.975), (-24.125002811, 1.975))
            ThreePointArc((-24.125002811, 1.975), (-20.79, 0.9525), (-17.454997189, 1.975))
        make_face()
    extrude(amount=-BOSS_EXTRUDE14_DEPTH)

    # Sketch29 → Boss-Extrude16 (add)
    with BuildSketch(Plane(origin=(0, 0, -35.745), x_dir=(-1, 0, 0), z_dir=(0, 0, -1)).offset(BOSS_EXTRUDE16_START)):
        with Locations((-20.79, 6.9025)):
            Circle(SKETCH29_R)
        with Locations(Location((-20.79, 6.9025, 0), (0, 0, 180))):
            Circle(SKETCH29_R_2, mode=Mode.SUBTRACT)
    extrude(amount=-BOSS_EXTRUDE16_DEPTH)

    # Boss-Extrude17: up to this face of the body (flat: up to its plane)
    boss_extrude17_end = Plane(part.part.faces().sort_by_distance((20.79, 8.452730204, -28.375))[0])
    # Sketch31 → Boss-Extrude17 (add, up to the picked face)
    with BuildSketch(Plane.XY.offset(-35.745), mode=Mode.PRIVATE) as boss_extrude17_sk1:
        with Locations((7.5875, 6.594522063)):
            Rectangle(SKETCH31_W, SKETCH31_H)
    boss_extrude17_tool1 = split(extrude(boss_extrude17_sk1.sketch, amount=BOSS_EXTRUDE17_REACH, mode=Mode.PRIVATE), bisect_by=boss_extrude17_end, keep=Keep.BOTH, mode=Mode.PRIVATE)
    # Sketch31 → Boss-Extrude17 (add, up to the picked face)
    with BuildSketch(Plane.XY.offset(-35.745), mode=Mode.PRIVATE) as boss_extrude17_sk2:
        with Locations((33.9925, 6.594522063)):
            Rectangle(SKETCH31_W, SKETCH31_H)
    boss_extrude17_tool2 = split(extrude(boss_extrude17_sk2.sketch, amount=BOSS_EXTRUDE17_REACH, mode=Mode.PRIVATE), bisect_by=boss_extrude17_end, keep=Keep.BOTH, mode=Mode.PRIVATE)
    add(boss_extrude17_tool1.solids().sort_by(Axis((7.5875, 6.594522, -35.745), (0, 0, 1)))[0])
    add(boss_extrude17_tool2.solids().sort_by(Axis((33.9925, 6.594522, -35.745), (0, 0, 1)))[0])

    # Sketch33 → Boss-Extrude18 (add)
    with BuildSketch(Plane.XZ):
        Polygon((3.175, -25.2), (3.175, -22.612118687), (0, -22.612118687), (0, -28.375), (6, -28.375), (9.175, -28.375), (32.405, -28.375), (35.58, -28.375), (41.58, -28.375), (41.58, -22.612118687), (38.405, -22.612118687), (38.405, -25.2), align=None)
    extrude(amount=BOSS_EXTRUDE18_DEPTH)

    # Sketch34 → Boss-Extrude19 (add)
    with BuildSketch(Plane.XY.offset(-30.745)):
        with Locations(Location((20.79, 6.9025, 0), (0, 0, 180))):
            Circle(SKETCH34_R)
    extrude(amount=BOSS_EXTRUDE19_DEPTH)

    # Chamfer7
    chamfer7_edges = [part.edges().sort_by_distance(p)[0] for p in [
        (20.79, -6.825, -35.745),
        (20.79, -6.825, -28.375),
    ]]
    chamfer(chamfer7_edges, length=CHAMFER7_SIZE - 0.0001)  # a hair under: the kernel refuses the full size

    # Chamfer8
    chamfer8_edges = [part.edges().sort_by_distance(p)[0] for p in [
        (39.9925, -6.825, -22.612118687),
        (1.5875, -6.825, -22.612118687),
    ]]
    chamfer(chamfer8_edges, length=CHAMFER8_SIZE)


with BuildPart() as body_2:
    # Mirror1: mirrored copy
    add(part.part.mirror(Plane(origin=(51.58, 0, 0), x_dir=(0, 0, 1), z_dir=(1, 0, 0))))


solid = body_2.part
